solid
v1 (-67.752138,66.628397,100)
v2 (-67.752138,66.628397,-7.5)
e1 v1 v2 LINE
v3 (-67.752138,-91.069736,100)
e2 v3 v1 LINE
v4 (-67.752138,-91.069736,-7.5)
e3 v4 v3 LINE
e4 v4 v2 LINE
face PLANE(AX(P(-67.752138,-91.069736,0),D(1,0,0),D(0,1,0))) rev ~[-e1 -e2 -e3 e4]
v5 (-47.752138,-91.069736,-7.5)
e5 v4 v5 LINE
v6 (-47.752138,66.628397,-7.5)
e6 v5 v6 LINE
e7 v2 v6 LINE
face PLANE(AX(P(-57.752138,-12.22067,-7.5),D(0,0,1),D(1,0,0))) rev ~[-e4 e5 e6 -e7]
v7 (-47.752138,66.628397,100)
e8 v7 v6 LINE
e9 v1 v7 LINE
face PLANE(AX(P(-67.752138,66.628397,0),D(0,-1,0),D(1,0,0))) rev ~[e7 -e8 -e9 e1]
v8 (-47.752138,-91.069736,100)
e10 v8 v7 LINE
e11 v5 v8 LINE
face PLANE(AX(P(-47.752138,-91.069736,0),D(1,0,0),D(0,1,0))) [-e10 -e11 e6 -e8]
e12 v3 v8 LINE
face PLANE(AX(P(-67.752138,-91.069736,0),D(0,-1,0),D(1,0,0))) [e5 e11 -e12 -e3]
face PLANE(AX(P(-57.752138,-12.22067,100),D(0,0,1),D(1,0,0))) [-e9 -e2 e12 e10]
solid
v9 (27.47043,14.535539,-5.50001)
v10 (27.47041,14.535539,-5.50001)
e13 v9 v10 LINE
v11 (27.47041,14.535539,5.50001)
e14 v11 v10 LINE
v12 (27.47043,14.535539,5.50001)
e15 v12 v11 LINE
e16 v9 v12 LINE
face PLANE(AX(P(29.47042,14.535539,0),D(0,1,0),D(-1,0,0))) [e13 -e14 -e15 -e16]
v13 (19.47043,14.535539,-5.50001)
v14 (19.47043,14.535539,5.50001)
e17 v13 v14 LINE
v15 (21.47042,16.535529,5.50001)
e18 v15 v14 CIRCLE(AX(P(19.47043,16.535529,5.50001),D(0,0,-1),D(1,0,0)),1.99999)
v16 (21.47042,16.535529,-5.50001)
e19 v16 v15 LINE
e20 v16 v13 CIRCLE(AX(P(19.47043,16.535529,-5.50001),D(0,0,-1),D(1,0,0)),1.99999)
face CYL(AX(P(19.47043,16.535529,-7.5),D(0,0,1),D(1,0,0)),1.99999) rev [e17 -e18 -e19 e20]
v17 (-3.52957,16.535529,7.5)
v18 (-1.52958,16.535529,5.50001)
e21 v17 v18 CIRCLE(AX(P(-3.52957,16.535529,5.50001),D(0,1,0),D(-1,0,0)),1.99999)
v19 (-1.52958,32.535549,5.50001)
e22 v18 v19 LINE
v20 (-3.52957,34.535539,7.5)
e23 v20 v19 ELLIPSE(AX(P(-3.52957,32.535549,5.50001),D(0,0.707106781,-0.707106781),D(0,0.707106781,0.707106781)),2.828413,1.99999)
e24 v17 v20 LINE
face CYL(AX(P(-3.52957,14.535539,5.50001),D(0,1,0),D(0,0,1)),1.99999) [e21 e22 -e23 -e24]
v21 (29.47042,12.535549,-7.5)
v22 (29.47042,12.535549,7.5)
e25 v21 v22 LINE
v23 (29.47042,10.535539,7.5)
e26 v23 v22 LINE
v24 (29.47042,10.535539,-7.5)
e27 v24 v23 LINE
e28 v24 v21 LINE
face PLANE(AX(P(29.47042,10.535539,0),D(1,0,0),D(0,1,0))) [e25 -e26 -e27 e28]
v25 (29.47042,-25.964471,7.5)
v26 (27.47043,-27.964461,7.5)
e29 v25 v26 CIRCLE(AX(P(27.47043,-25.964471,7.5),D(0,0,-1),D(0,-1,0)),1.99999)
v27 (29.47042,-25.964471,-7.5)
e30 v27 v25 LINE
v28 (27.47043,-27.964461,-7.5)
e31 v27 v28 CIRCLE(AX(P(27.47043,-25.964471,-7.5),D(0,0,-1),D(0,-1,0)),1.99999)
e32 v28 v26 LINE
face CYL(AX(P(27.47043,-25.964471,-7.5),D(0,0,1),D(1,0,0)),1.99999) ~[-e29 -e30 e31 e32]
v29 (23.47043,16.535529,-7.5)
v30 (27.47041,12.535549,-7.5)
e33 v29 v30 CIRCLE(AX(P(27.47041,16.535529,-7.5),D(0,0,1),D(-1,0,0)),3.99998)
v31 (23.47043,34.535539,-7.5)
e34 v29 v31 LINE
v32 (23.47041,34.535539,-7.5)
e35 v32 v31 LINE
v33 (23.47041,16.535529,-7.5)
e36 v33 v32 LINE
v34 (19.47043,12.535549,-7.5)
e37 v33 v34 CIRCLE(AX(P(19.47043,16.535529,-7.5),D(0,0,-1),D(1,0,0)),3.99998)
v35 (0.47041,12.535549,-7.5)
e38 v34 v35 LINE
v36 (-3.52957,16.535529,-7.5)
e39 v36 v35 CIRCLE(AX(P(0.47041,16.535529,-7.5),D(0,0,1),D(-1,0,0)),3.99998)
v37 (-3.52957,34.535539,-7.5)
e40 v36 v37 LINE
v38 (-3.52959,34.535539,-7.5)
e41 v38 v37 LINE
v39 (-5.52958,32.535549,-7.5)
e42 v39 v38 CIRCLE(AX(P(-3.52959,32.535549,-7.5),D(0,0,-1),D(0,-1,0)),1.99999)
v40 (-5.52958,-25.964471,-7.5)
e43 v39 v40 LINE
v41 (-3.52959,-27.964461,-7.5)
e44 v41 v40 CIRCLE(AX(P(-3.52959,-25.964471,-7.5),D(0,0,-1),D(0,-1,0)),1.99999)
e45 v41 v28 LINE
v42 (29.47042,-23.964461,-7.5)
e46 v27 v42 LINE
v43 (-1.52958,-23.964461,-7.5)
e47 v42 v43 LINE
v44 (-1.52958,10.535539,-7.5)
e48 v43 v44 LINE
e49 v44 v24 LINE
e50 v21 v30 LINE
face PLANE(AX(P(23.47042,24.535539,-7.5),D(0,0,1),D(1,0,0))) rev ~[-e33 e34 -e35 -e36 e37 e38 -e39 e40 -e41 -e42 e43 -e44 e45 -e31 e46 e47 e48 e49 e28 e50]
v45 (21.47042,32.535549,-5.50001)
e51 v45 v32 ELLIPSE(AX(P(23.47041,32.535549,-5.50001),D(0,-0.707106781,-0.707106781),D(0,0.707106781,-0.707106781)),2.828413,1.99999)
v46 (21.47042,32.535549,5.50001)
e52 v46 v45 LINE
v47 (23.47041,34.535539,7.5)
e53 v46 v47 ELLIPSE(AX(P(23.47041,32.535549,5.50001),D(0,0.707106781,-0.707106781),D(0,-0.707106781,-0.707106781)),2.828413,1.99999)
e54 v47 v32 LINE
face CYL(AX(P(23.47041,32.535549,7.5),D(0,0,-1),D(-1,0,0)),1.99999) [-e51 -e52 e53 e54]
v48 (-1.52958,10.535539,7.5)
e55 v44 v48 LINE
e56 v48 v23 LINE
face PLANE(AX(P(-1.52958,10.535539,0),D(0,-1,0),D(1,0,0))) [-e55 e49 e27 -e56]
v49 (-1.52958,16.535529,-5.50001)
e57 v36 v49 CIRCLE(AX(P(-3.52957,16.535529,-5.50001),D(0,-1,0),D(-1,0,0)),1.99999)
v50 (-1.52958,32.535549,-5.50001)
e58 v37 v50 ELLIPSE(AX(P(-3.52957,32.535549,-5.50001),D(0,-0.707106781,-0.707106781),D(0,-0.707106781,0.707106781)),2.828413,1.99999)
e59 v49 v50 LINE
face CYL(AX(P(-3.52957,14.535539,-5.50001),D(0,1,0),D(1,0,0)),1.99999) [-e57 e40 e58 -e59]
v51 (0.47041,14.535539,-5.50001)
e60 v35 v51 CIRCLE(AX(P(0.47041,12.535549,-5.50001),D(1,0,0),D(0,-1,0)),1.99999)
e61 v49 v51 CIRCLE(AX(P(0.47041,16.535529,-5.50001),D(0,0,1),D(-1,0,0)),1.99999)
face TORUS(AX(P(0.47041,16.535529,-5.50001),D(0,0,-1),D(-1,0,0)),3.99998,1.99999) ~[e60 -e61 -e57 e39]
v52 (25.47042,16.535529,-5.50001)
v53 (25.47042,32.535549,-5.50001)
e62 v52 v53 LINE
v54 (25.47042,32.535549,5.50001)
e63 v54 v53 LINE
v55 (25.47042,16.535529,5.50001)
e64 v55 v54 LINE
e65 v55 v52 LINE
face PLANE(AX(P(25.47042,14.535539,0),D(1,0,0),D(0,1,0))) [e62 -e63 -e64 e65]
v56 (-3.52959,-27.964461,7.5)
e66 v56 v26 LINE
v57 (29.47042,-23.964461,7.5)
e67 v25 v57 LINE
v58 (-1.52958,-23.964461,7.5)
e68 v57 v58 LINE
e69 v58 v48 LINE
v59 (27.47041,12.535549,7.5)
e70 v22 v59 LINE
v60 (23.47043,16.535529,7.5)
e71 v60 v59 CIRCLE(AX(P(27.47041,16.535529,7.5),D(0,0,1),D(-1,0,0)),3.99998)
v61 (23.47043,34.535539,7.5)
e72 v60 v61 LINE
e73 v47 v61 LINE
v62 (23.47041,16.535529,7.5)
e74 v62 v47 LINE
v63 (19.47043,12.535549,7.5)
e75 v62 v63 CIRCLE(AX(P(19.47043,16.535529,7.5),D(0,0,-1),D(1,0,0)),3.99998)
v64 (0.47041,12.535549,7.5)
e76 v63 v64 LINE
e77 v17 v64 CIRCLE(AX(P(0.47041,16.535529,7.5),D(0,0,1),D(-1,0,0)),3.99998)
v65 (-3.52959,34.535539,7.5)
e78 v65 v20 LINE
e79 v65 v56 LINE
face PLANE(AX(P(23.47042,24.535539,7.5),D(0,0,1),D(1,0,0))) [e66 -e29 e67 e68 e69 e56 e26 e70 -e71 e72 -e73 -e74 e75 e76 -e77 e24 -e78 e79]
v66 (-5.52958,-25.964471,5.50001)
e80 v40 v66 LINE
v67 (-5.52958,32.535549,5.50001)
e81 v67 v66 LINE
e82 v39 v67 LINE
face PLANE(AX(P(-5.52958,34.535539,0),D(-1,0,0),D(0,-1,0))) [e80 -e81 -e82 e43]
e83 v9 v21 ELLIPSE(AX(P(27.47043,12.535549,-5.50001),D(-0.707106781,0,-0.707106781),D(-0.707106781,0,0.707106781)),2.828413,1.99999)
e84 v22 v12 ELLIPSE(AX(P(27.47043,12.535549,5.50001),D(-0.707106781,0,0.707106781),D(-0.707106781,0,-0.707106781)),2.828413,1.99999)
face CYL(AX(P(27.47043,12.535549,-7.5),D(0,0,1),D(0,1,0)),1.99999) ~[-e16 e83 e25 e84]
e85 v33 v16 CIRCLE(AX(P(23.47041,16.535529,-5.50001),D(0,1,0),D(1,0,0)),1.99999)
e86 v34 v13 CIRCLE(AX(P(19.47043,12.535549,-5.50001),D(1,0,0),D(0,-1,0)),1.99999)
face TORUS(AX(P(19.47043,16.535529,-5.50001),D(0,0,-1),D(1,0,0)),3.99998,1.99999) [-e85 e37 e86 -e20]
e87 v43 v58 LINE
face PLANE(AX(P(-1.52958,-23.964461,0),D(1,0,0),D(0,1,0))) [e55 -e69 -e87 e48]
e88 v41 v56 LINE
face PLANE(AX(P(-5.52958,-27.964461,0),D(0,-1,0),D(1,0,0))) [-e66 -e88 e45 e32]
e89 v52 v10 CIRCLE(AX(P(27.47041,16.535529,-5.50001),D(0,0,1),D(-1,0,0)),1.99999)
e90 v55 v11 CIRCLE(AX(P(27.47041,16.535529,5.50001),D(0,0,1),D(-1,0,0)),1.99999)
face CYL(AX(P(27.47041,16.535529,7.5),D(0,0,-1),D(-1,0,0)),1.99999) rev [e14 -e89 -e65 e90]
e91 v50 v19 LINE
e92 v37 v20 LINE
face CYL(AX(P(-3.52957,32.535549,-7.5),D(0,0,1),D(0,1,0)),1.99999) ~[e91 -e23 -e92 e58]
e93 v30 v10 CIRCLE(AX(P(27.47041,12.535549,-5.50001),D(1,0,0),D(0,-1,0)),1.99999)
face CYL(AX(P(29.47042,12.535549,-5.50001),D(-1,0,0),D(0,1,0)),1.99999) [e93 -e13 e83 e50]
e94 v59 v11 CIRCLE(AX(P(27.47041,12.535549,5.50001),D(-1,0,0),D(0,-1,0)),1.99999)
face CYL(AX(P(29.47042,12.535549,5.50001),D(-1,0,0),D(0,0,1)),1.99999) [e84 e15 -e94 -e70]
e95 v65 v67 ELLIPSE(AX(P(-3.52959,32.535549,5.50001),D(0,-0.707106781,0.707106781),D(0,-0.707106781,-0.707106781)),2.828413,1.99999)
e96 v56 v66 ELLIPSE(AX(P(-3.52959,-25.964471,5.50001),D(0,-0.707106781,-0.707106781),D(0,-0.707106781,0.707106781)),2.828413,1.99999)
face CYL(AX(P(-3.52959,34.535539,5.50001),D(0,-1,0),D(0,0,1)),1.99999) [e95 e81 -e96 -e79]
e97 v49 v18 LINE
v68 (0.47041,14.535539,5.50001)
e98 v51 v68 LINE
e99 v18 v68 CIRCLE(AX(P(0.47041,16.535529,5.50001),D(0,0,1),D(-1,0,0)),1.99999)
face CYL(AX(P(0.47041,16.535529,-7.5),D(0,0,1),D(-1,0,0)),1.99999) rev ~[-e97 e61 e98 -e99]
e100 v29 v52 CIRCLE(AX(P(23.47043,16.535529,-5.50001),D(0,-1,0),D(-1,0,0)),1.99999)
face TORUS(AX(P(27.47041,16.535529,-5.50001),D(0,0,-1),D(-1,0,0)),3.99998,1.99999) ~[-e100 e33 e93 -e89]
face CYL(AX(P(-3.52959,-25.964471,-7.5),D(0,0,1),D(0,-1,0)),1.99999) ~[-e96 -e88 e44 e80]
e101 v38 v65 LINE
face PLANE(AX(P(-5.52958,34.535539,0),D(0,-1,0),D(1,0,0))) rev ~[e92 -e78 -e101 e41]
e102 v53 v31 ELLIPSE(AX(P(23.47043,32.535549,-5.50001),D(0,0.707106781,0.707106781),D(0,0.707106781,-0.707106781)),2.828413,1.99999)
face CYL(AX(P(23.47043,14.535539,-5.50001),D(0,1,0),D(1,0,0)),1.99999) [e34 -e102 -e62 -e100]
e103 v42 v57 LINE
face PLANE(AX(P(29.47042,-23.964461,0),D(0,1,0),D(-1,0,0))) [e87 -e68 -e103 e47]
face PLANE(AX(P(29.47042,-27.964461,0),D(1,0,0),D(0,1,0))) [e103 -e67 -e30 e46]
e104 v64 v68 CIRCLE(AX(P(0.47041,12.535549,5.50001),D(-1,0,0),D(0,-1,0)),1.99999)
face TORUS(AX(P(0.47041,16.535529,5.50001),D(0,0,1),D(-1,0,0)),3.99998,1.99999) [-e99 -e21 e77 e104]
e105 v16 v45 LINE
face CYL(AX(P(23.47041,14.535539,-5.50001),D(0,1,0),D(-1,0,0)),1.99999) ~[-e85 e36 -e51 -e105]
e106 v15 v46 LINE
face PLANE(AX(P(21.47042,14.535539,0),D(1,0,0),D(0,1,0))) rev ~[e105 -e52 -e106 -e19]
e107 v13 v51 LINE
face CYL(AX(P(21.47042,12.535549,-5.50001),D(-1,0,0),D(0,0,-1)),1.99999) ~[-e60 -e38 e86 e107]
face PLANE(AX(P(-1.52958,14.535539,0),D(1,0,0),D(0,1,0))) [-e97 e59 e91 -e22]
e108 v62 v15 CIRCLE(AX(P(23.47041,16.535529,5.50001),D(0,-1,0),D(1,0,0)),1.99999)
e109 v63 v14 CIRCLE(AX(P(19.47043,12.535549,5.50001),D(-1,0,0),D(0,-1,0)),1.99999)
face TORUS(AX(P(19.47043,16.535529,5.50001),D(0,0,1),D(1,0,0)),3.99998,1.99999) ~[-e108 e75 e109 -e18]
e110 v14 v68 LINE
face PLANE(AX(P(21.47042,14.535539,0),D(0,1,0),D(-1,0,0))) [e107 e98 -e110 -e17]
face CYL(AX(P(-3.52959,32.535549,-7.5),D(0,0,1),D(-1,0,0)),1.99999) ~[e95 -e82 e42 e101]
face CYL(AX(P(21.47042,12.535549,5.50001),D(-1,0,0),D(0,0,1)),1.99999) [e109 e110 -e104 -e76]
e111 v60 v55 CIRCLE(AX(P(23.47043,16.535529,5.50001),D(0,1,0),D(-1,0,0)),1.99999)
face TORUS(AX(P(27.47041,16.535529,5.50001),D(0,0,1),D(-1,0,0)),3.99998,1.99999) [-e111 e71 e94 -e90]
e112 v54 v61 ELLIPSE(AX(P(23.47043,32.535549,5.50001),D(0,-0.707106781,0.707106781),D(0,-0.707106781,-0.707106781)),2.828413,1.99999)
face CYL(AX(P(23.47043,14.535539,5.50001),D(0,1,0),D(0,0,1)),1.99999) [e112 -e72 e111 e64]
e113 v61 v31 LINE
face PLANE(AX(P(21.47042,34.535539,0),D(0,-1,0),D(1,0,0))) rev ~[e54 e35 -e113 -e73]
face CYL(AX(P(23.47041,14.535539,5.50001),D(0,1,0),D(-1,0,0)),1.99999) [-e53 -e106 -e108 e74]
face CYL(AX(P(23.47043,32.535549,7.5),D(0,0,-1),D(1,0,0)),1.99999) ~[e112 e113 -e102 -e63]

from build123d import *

# Parameters (mm, degrees)
F0_W     = 20
F0_H     = 157.6981320977
F1_DEPTH = 7.5
F0_W_2   = 4
F0_H_2   = 20
F2_R     = 1.99999
F3_DEPTH = 100


# Not quite as in the source:
# - a fillet or chamfer is up to 0.001 mm smaller than in the source, because OpenCascade refuses the exact size


with BuildPart() as f1:
    # F0 (on Top) → F1 (new body, symmetric)
    with BuildSketch(Plane.XY):
        with Locations((-57.7521377802, -12.2206695378)):
            Rectangle(F0_W, F0_H)
    extrude(amount=F1_DEPTH, both=True)

    # F0 (on Top) → F3 (join)
    with BuildSketch(Plane.XY):
        with Locations((-57.7521377802, -12.2206695378)):
            Rectangle(F0_W, F0_H)
    extrude(amount=F3_DEPTH)


with BuildPart() as f1b:
    # F0 (on Top) → F1, piece 2 (new body, symmetric)
    with BuildSketch(Plane.XY):
        with Locations((23.4704200836, 24.5355388032)):
            Rectangle(F0_W_2, F0_H_2)
        Polygon((29.4704200836, 10.5355388032), (29.4704200836, 14.5355388032), (25.4704200836, 14.5355388032), (21.4704200836, 14.5355388032), (-1.5295799164, 14.5355388032), (-5.5295799164, 14.5355388032), (-5.5295799164, -27.9644611968), (29.4704200836, -27.9644611968), (29.4704200836, -23.9644611968), (27.4704200836, -23.9644611968), (-1.5295799164, -23.9644611968), (-1.5295799164, 10.5355388032), (27.4704200836, 10.5355388032), align=None)
        with Locations((-3.5295799164, 24.5355388032)):
            Rectangle(F0_W_2, F0_H_2)
    extrude(amount=F1_DEPTH, both=True)

    # F2 (radius 2 in the source; OpenCascade refuses exactly that, so slightly less here)
    f2_edges = [f1b.edges().sort_by_distance(p)[0] for p in [
        (9.97042, 14.535539, 7.5),
        (27.47042, 14.535539, 7.5),
        (9.97042, 14.535539, -7.5),
        (27.47042, 14.535539, -7.5),
        (-5.52958, 3.285539, 7.5),
        (29.47042, -27.964461, 0),
        (-5.52958, -27.964461, 0),
        (29.47042, 14.535539, 0),
        (25.47042, 34.535539, 0),
        (-1.52958, 34.535539, 0),
        (21.47042, 34.535539, 0),
        (-5.52958, 34.535539, 0),
        (25.47042, 14.535539, 0),
        (21.47042, 14.535539, 0),
        (-1.52958, 14.535539, 0),
        (25.47042, 24.535539, -7.5),
        (25.47042, 24.535539, 7.5),
        (-1.52958, 24.535539, -7.5),
        (-1.52958, 24.535539, 7.5),
        (21.47042, 24.535539, -7.5),
        (21.47042, 24.535539, 7.5),
    ]]
    fillet(f2_edges, radius=F2_R)


solid = Compound([f1.part, f1b.part])
